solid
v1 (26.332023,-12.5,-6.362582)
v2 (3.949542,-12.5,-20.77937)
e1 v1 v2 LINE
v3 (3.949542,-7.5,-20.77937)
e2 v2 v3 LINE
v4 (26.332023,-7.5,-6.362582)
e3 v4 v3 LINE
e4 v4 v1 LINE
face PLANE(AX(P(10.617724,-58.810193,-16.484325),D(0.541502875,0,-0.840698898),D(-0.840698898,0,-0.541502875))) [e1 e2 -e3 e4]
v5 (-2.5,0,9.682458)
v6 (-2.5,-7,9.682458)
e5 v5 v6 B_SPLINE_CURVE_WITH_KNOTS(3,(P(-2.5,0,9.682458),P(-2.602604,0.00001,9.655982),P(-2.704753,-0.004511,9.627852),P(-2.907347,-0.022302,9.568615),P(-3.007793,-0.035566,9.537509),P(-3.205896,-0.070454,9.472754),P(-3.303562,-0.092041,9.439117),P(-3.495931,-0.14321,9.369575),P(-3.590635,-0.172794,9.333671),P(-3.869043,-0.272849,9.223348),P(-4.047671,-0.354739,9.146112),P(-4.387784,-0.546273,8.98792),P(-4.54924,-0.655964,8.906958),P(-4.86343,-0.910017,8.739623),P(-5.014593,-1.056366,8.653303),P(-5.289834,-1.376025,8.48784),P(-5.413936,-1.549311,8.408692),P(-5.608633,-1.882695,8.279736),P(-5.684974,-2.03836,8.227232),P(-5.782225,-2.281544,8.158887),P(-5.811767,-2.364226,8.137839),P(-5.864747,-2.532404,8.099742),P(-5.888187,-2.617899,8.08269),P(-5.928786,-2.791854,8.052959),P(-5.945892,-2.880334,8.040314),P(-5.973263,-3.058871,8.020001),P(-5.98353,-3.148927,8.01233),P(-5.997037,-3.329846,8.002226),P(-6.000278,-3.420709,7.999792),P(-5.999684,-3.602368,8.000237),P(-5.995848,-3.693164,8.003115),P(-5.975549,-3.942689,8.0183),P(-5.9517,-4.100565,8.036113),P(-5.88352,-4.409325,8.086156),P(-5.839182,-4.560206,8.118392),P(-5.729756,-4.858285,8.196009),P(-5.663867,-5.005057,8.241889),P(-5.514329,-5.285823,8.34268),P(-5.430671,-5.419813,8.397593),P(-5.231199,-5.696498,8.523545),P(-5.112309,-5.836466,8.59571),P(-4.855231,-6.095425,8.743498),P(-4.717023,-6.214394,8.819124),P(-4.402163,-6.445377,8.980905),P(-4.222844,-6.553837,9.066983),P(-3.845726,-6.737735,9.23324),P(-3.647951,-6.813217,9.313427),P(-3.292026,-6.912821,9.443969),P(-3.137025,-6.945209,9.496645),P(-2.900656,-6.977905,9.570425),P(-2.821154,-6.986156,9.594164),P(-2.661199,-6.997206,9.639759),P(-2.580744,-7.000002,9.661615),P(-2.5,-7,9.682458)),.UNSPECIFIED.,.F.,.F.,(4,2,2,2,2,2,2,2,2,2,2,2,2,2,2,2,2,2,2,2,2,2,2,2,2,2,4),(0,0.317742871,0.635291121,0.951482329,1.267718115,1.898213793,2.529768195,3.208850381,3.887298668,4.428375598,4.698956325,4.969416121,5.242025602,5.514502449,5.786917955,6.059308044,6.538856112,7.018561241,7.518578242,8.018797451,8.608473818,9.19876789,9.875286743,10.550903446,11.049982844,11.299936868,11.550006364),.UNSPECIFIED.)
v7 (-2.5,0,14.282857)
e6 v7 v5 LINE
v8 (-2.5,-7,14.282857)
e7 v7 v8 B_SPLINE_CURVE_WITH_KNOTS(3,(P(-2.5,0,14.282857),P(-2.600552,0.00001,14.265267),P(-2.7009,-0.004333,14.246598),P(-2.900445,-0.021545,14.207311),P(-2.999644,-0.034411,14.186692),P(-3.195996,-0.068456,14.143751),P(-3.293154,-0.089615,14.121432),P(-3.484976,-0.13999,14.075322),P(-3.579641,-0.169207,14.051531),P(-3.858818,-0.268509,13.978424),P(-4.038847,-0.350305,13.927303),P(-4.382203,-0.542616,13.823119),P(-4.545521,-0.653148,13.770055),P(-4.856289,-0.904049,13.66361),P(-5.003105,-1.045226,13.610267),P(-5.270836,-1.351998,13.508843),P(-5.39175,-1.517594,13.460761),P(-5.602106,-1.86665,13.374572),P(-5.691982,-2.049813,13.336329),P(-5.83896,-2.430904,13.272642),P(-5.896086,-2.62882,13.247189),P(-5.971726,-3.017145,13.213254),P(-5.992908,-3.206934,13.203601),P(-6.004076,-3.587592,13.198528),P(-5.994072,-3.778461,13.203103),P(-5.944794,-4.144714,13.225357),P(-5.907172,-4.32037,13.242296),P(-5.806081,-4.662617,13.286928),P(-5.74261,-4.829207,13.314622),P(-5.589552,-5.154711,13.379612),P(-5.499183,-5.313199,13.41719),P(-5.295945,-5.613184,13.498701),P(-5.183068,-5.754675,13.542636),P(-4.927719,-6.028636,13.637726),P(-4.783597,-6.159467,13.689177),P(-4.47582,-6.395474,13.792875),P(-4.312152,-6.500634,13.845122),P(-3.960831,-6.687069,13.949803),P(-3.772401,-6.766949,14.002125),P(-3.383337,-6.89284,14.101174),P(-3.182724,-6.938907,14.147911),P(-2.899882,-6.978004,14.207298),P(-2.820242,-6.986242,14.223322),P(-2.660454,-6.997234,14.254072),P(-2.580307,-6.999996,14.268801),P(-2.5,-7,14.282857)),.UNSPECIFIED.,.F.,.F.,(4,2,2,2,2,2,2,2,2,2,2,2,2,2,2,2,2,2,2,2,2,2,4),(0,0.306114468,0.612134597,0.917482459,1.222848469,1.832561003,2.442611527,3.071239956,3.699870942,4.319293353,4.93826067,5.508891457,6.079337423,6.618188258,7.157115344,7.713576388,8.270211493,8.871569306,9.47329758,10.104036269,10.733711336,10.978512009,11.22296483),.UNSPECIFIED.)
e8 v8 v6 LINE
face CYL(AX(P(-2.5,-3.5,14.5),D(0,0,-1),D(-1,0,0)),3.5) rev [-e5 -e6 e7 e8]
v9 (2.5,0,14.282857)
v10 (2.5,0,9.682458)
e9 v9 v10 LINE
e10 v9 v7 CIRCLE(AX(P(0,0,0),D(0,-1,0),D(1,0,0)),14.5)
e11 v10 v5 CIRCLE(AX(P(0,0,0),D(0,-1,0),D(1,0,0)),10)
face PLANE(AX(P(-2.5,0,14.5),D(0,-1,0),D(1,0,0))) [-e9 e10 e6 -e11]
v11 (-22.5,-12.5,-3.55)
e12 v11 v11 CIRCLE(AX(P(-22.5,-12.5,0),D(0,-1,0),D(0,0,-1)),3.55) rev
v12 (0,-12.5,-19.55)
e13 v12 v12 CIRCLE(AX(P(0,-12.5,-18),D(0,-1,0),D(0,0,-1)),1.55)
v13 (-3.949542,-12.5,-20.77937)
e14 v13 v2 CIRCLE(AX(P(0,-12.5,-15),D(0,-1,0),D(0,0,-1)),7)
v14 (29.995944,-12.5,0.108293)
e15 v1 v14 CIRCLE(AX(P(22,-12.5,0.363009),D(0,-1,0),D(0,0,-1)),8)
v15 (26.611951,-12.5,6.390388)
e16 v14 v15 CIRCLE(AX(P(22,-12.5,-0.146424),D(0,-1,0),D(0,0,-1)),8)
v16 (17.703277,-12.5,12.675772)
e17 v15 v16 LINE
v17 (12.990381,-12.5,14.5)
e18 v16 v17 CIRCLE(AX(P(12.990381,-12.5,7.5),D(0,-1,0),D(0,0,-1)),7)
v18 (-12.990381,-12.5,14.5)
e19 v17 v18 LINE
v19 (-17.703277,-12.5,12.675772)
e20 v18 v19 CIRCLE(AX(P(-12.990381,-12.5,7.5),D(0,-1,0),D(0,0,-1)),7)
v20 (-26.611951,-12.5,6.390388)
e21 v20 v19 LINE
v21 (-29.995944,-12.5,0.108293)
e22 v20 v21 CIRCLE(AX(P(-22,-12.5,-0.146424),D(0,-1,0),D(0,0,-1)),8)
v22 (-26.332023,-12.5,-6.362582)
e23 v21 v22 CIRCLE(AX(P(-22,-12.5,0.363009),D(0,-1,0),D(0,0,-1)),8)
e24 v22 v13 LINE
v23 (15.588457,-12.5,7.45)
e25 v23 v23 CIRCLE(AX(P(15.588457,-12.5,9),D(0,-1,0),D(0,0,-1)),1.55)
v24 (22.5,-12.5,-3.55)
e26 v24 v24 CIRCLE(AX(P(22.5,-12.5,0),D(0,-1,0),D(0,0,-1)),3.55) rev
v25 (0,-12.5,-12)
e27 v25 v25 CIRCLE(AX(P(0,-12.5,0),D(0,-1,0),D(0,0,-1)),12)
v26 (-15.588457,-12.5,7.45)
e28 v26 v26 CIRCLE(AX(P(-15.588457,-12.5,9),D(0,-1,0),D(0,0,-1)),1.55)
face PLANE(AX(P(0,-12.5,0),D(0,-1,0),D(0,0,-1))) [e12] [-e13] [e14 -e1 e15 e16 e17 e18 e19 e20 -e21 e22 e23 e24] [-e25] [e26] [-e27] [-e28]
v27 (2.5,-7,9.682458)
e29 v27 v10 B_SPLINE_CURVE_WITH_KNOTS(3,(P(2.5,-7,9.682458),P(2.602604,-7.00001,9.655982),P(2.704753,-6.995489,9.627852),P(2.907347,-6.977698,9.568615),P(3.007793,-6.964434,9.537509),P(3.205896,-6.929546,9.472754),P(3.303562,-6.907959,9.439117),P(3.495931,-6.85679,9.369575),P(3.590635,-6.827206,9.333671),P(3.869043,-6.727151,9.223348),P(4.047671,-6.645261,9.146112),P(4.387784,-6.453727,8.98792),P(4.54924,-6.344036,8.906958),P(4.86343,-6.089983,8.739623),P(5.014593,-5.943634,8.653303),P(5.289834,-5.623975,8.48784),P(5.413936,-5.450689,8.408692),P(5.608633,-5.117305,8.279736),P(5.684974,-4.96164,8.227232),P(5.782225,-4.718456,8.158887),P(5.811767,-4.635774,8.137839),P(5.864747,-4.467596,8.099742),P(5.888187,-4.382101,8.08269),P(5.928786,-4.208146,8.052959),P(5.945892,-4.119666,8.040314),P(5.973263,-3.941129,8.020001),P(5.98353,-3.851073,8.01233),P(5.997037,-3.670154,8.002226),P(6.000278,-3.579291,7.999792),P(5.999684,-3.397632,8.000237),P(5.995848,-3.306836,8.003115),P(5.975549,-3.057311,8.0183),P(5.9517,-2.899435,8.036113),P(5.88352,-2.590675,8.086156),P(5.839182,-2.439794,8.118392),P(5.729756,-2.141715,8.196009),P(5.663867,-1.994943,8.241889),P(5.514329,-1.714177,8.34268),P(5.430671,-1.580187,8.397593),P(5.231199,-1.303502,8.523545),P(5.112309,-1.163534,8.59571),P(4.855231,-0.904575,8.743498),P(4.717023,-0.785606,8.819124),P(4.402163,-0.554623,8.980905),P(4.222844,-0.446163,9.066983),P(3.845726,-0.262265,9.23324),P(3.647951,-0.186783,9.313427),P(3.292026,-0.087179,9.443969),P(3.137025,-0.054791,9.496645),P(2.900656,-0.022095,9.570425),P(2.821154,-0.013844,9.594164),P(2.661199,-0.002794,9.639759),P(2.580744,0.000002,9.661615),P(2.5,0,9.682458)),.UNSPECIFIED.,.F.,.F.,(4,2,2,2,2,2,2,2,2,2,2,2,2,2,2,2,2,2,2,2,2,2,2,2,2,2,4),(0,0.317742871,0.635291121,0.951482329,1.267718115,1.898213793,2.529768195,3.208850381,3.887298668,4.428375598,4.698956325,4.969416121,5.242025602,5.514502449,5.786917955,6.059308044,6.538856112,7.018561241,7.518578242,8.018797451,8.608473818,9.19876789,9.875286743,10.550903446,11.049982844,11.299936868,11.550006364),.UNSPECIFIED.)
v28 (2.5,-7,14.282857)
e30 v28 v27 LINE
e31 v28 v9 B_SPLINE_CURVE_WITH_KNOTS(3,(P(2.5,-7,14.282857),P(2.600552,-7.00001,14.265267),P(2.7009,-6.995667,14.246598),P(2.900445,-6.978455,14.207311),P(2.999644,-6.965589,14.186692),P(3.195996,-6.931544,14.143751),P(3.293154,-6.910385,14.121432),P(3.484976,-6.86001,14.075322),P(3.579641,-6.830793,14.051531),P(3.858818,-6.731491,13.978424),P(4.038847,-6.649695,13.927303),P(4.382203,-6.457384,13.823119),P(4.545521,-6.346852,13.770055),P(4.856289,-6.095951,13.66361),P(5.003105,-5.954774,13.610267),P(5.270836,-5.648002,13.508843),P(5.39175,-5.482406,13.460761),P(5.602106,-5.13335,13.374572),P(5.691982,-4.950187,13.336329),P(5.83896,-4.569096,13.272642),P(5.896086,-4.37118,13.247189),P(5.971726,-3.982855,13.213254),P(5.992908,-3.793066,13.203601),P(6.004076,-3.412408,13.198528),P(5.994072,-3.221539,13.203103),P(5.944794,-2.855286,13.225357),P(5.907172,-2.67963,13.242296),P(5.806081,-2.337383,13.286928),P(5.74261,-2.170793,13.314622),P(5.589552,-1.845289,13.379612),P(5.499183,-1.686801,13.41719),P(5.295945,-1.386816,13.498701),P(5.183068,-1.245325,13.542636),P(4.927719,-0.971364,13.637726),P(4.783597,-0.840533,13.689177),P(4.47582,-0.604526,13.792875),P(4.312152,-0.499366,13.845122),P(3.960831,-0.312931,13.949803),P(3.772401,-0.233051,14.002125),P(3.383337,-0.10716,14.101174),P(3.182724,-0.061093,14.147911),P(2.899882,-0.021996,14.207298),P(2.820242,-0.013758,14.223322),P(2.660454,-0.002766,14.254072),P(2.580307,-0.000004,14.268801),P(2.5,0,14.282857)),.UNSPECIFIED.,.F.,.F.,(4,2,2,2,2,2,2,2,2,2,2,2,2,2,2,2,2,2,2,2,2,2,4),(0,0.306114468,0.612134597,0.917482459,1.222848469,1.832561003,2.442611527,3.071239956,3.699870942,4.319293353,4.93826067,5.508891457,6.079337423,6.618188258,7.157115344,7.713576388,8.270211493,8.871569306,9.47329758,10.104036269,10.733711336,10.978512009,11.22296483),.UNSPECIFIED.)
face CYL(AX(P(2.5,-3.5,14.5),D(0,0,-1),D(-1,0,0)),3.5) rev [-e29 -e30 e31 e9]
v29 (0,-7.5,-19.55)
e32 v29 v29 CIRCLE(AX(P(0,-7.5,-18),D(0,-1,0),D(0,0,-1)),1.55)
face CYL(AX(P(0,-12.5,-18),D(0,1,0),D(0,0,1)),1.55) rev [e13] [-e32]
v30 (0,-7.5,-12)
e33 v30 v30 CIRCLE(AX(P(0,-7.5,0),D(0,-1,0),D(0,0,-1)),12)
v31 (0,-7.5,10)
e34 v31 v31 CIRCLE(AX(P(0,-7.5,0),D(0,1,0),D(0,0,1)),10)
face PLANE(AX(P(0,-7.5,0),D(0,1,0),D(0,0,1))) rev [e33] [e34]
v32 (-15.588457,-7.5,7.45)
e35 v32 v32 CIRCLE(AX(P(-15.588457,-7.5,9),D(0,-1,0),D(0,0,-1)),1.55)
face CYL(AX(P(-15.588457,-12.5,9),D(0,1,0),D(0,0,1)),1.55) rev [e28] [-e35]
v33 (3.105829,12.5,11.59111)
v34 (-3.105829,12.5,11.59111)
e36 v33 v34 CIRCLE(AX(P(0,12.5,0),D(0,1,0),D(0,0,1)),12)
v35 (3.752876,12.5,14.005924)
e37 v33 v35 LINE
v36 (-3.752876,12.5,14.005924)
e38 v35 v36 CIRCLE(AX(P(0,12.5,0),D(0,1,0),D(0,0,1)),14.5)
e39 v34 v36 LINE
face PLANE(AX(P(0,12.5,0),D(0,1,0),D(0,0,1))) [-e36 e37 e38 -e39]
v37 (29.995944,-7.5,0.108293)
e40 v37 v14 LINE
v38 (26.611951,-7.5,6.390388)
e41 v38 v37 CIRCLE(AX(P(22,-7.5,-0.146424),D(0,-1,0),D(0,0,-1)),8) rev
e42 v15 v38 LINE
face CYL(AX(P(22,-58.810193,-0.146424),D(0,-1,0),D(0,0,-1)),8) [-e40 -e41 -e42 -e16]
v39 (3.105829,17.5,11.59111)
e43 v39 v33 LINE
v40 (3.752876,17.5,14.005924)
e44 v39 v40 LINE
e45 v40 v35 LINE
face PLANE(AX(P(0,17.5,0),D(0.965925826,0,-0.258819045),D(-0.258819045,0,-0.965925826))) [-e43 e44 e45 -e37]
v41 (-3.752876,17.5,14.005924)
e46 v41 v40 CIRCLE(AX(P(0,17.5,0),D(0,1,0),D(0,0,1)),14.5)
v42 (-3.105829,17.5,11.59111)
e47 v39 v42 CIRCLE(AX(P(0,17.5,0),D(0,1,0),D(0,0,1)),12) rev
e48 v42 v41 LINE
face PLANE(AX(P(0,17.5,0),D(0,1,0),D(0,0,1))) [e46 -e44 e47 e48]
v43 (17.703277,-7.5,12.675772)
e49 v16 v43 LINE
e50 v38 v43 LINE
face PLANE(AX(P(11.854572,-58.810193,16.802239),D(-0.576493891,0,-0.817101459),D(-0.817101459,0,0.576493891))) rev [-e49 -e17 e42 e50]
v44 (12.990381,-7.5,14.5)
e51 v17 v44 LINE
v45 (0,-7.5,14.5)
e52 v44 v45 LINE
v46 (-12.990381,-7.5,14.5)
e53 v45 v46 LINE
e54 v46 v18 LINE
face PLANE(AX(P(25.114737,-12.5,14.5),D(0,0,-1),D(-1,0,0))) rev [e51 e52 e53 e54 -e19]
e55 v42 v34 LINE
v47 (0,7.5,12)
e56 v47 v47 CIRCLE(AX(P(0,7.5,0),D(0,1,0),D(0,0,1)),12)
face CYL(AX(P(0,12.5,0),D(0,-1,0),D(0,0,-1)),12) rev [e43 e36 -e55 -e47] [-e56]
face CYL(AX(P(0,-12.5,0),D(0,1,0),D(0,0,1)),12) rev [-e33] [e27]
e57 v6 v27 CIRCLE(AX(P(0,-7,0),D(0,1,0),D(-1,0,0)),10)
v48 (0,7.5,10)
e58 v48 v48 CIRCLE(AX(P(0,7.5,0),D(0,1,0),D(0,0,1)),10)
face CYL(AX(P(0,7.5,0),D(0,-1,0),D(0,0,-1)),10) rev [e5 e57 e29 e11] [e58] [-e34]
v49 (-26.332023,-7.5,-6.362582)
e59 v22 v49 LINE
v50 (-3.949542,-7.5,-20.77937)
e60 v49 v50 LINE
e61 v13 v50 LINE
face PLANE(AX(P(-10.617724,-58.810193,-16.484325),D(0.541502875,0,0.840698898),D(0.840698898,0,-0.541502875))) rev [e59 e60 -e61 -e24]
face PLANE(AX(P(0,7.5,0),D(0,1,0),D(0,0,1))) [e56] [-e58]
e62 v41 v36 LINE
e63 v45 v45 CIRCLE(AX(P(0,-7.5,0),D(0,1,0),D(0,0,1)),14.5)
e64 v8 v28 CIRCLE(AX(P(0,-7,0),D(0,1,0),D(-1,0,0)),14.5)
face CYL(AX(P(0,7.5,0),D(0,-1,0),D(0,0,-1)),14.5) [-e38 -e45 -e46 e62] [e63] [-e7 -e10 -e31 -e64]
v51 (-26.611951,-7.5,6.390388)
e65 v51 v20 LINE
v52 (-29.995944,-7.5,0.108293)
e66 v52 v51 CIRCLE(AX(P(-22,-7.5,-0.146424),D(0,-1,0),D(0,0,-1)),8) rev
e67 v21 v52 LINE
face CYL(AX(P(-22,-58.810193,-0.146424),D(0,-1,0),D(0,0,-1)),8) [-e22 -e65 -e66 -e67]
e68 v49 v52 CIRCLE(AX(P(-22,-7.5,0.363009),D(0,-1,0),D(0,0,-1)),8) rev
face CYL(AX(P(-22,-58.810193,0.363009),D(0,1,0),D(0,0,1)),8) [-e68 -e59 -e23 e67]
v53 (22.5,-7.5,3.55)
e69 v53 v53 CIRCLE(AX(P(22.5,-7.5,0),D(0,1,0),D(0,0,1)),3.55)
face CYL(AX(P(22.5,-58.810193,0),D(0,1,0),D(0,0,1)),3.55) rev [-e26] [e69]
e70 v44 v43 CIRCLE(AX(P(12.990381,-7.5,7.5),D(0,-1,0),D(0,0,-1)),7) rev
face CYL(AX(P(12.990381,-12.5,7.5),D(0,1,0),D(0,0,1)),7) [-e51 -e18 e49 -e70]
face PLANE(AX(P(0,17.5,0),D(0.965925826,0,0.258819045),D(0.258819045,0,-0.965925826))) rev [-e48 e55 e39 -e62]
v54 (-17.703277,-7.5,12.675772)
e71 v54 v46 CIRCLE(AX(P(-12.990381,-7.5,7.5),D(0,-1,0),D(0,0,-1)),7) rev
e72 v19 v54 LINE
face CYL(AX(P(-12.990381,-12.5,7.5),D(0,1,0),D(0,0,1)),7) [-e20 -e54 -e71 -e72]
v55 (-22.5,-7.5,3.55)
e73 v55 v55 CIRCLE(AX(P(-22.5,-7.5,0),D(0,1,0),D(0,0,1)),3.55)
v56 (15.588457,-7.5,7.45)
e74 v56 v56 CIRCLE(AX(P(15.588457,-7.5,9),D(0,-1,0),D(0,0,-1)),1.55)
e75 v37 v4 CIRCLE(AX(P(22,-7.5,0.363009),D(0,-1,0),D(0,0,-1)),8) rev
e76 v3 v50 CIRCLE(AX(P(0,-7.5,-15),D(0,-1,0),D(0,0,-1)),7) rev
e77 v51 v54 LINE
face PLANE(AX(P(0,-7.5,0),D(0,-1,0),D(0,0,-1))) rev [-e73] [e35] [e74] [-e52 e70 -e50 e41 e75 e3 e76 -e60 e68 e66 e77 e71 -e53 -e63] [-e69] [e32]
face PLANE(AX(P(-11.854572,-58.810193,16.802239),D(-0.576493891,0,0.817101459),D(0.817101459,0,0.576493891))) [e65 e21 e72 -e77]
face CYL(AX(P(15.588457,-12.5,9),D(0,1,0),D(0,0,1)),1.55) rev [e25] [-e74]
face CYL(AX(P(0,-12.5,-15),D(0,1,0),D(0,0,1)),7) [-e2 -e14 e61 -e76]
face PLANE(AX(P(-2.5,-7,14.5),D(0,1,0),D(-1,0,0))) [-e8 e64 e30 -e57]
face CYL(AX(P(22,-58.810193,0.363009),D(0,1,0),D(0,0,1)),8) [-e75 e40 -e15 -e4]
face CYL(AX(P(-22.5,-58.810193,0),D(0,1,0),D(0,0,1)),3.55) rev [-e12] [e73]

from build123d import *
from build123d.topology import SkipClean

# Parameters (mm, degrees)
SKETCH1_R           = 14.5
SKETCH1_R_2         = 10
BOSS_EXTRUDE1_DEPTH = 7.5
BOSS_EXTRUDE2_START = 5
SKETCH2_R           = 14.5
SKETCH2_R_2         = 12
BOSS_EXTRUDE2_DEPTH = 5
SKETCH3_R           = 12
SKETCH3_R_2         = 1.55
BOSS_EXTRUDE3_DEPTH = 5
FILLET1_R           = 7
BOSS_EXTRUDE4_START = 5
BOSS_EXTRUDE4_DEPTH = 5
CUT_EXTRUDE1_DEPTH  = 35.494425
EXTRUDE_START       = -5
SKETCH_1_R          = 3.55
SKETCH_1_R_2        = 1.55
EXTRUDE_1_DEPTH     = 5
FILLET_1_R          = 8


with BuildPart() as part:
    # Sketch1 → Boss-Extrude1 (new, symmetric)
    with BuildSketch(Plane(origin=(0, 0, 0), x_dir=(1, 0, 0), z_dir=(0, 1, 0))):
        with Locations(Location((0, 0, 0), (0, 0, 270))):
            Circle(SKETCH1_R)
        with Locations(Location((0, 0, 0), (0, 0, 270))):
            Circle(SKETCH1_R_2, mode=Mode.SUBTRACT)
    extrude(amount=BOSS_EXTRUDE1_DEPTH, both=True)

    # Sketch2 → Boss-Extrude2 (add)
    with BuildSketch(Plane(origin=(0, 7.5, 0), x_dir=(1, 0, 0), z_dir=(0, 1, 0)).offset(BOSS_EXTRUDE2_START)):
        with Locations(Location((0, 0, 0), (0, 0, 270))):
            Circle(SKETCH2_R)
        with Locations(Location((0, 0, 0), (0, 0, 270))):
            Circle(SKETCH2_R_2, mode=Mode.SUBTRACT)
    extrude(amount=-BOSS_EXTRUDE2_DEPTH)

    # Sketch3 → Boss-Extrude3 (add)
    with BuildSketch(Plane(origin=(0, -7.5, 0), x_dir=(-1, 0, 0), z_dir=(0, -1, 0))):
        Polygon((0, 29), (-25.114737, -14.5), (25.114737, -14.5), align=None)
        with Locations(Location((0, 0, 0), (0, 0, 270))):
            Circle(SKETCH3_R, mode=Mode.SUBTRACT)
        with Locations(Location((15.588457, -9, 0), (0, 0, 90))):
            Circle(SKETCH3_R_2, mode=Mode.SUBTRACT)
        with Locations(Location((-15.588457, -9, 0), (0, 0, 90))):
            Circle(SKETCH3_R_2, mode=Mode.SUBTRACT)
        with Locations(Location((0, 18, 0), (0, 0, 90))):
            Circle(SKETCH3_R_2, mode=Mode.SUBTRACT)
    extrude(amount=BOSS_EXTRUDE3_DEPTH)

    # Fillet1
    fillet1_edges = [part.edges().sort_by_distance(p)[0] for p in [
        (-25.114737, -10, 14.5),
        (0, -10, -29),
        (25.114737, -10, 14.5),
    ]]
    fillet(fillet1_edges, radius=FILLET1_R)

    # Sketch4 → Boss-Extrude4 (add)
    with SkipClean():  # the faces are left unmerged after this step: merging them gives an invalid solid
        with BuildSketch(Plane(origin=(0, 12.5, 0), x_dir=(1, 0, 0), z_dir=(0, 1, 0)).offset(BOSS_EXTRUDE4_START)):
            with BuildLine():
                Line((3.752876, -14.005924), (3.105829, -11.59111))
                ThreePointArc((3.105829, -11.59111), (0, -12), (-3.105829, -11.59111))
                Line((-3.105829, -11.59111), (-3.752876, -14.005924))
                ThreePointArc((-3.752876, -14.005924), (0, -14.5), (3.752876, -14.005924))
            make_face()
        extrude(amount=-BOSS_EXTRUDE4_DEPTH)

    # Sketch5 → Cut-Extrude1 (cut, through all)
    with SkipClean():  # the faces are left unmerged after this step: merging them gives an invalid solid
        with BuildSketch(Plane.XY):
            with BuildLine():
                Line((-2.5, 0), (2.5, 0))
                ThreePointArc((2.5, 0), (6, -3.5), (2.5, -7))
                Line((2.5, -7), (-2.5, -7))
                ThreePointArc((-2.5, -7), (-6, -3.5), (-2.5, 0))
            make_face()
        extrude(amount=CUT_EXTRUDE1_DEPTH, mode=Mode.SUBTRACT)

    # 草图1 → 凸台-拉伸1 (add)
    # profile 1 of 3: a face of its own
    with SkipClean():  # the faces are left unmerged after this step: merging them gives an invalid solid
        with BuildSketch(Plane(origin=(0, -7.5, 0), x_dir=(1, 0, 0), z_dir=(0, 1, 0)).offset(EXTRUDE_START)):
            with BuildLine():
                Line((-30, 4), (-30, -4))
                Line((-30, -4), (-17.703277, -12.675772))
                ThreePointArc((-17.703277, -12.675772), (-19.907231, -8.575729), (-19.052559, -4))
                Line((-19.052559, -4), (-12.557368, 7.25))
                Line((-12.557368, 7.25), (-6.062178, 18.5))
                ThreePointArc((-6.062178, 18.5), (-5.133957, 19.758412), (-3.949542, 20.77937))
                Line((-3.949542, 20.77937), (-30, 4))
            make_face()
            with Locations(Location((-22.5, 0, 0), (0, 0, 270))):
                Circle(SKETCH_1_R, mode=Mode.SUBTRACT)
        # profile 2 of 3: a face of its own
        with BuildSketch(Plane(origin=(0, -7.5, 0), x_dir=(1, 0, 0), z_dir=(0, 1, 0)).offset(EXTRUDE_START)):
            with BuildLine():
                Line((6.062178, 18.5), (12.557368, 7.25))
                Line((12.557368, 7.25), (19.052559, -4))
                ThreePointArc((19.052559, -4), (19.907231, -8.575729), (17.703277, -12.675772))
                Line((17.703277, -12.675772), (30, -4))
                Line((30, -4), (30, 4))
                Line((30, 4), (3.949542, 20.77937))
                ThreePointArc((3.949542, 20.77937), (5.133957, 19.758412), (6.062178, 18.5))
            make_face()
            with Locations(Location((22.5, 0, 0), (0, 0, 270))):
                Circle(SKETCH_1_R, mode=Mode.SUBTRACT)
        # profile 3 of 3: a face of its own
        with BuildSketch(Plane(origin=(0, -7.5, 0), x_dir=(1, 0, 0), z_dir=(0, 1, 0)).offset(EXTRUDE_START)):
            with BuildLine():
                ThreePointArc((0, -14.5), (-12.557368, -7.25), (-12.557368, 7.25))
                Line((-12.557368, 7.25), (-19.052559, -4))
                ThreePointArc((-19.052559, -4), (-19.052559, -11), (-12.990381, -14.5))
                Line((-12.990381, -14.5), (0, -14.5))
            make_face()
            with Locations(Location((-15.588457, -9, 0), (0, 0, 90))):
                Circle(SKETCH_1_R_2, mode=Mode.SUBTRACT)
        extrude(amount=EXTRUDE_1_DEPTH)

    # 圆角1
    # the kernel refuses this fillet: 8 mm, written as the material it takes off along each edge
    with BuildSketch(Plane(origin=(30, -23.407523, -4), x_dir=(-0.8406988978584584, 0, -0.5415028745441463), z_dir=(0, 1, 0)), Plane(origin=(-30, -23.407523, -4), x_dir=(0, 0, 1), z_dir=(0, 1, 0))) as fillet_1_piece_1:
        with BuildLine():
            CenterArc((FILLET_1_R * 0.545376146708, FILLET_1_R), FILLET_1_R, 212.786005, 57.213995)
            Line((-FILLET_1_R * 0.29532275115, FILLET_1_R * 0.458497125456), (0, 0))
            Line((0, 0), (FILLET_1_R * 0.545376146708, 0))
        make_face()
    extrude(amount=26.815046, mode=Mode.SUBTRACT)
    with BuildSketch(Plane(origin=(30, -22.866059, 4), x_dir=(-0.8171014589275256, 0, 0.5764938905300812), z_dir=(0, 1, 0))) as fillet_1_piece_2:
        with BuildLine():
            CenterArc((FILLET_1_R * 0.518302965737, -FILLET_1_R), FILLET_1_R, 90, 54.795682)
            Line((-FILLET_1_R * 0.298798493191, -FILLET_1_R * 0.42350610947), (0, 0))
            Line((0, 0), (FILLET_1_R * 0.518302965737, 0))
        make_face()
    extrude(amount=25.732119, mode=Mode.SUBTRACT)
    with BuildSketch(Plane(origin=(-30, -22.866059, 4), x_dir=(0.8171014589275294, 0, 0.5764938905300758), z_dir=(0, 1, 0))) as fillet_1_piece_3:
        with BuildLine():
            CenterArc((FILLET_1_R * 0.518302965737, FILLET_1_R), FILLET_1_R, 215.204318, 54.795682)
            Line((-FILLET_1_R * 0.298798493191, FILLET_1_R * 0.42350610947), (0, 0))
            Line((0, 0), (FILLET_1_R * 0.518302965737, 0))
        make_face()
    extrude(amount=25.732119, mode=Mode.SUBTRACT)


solid = part.part
